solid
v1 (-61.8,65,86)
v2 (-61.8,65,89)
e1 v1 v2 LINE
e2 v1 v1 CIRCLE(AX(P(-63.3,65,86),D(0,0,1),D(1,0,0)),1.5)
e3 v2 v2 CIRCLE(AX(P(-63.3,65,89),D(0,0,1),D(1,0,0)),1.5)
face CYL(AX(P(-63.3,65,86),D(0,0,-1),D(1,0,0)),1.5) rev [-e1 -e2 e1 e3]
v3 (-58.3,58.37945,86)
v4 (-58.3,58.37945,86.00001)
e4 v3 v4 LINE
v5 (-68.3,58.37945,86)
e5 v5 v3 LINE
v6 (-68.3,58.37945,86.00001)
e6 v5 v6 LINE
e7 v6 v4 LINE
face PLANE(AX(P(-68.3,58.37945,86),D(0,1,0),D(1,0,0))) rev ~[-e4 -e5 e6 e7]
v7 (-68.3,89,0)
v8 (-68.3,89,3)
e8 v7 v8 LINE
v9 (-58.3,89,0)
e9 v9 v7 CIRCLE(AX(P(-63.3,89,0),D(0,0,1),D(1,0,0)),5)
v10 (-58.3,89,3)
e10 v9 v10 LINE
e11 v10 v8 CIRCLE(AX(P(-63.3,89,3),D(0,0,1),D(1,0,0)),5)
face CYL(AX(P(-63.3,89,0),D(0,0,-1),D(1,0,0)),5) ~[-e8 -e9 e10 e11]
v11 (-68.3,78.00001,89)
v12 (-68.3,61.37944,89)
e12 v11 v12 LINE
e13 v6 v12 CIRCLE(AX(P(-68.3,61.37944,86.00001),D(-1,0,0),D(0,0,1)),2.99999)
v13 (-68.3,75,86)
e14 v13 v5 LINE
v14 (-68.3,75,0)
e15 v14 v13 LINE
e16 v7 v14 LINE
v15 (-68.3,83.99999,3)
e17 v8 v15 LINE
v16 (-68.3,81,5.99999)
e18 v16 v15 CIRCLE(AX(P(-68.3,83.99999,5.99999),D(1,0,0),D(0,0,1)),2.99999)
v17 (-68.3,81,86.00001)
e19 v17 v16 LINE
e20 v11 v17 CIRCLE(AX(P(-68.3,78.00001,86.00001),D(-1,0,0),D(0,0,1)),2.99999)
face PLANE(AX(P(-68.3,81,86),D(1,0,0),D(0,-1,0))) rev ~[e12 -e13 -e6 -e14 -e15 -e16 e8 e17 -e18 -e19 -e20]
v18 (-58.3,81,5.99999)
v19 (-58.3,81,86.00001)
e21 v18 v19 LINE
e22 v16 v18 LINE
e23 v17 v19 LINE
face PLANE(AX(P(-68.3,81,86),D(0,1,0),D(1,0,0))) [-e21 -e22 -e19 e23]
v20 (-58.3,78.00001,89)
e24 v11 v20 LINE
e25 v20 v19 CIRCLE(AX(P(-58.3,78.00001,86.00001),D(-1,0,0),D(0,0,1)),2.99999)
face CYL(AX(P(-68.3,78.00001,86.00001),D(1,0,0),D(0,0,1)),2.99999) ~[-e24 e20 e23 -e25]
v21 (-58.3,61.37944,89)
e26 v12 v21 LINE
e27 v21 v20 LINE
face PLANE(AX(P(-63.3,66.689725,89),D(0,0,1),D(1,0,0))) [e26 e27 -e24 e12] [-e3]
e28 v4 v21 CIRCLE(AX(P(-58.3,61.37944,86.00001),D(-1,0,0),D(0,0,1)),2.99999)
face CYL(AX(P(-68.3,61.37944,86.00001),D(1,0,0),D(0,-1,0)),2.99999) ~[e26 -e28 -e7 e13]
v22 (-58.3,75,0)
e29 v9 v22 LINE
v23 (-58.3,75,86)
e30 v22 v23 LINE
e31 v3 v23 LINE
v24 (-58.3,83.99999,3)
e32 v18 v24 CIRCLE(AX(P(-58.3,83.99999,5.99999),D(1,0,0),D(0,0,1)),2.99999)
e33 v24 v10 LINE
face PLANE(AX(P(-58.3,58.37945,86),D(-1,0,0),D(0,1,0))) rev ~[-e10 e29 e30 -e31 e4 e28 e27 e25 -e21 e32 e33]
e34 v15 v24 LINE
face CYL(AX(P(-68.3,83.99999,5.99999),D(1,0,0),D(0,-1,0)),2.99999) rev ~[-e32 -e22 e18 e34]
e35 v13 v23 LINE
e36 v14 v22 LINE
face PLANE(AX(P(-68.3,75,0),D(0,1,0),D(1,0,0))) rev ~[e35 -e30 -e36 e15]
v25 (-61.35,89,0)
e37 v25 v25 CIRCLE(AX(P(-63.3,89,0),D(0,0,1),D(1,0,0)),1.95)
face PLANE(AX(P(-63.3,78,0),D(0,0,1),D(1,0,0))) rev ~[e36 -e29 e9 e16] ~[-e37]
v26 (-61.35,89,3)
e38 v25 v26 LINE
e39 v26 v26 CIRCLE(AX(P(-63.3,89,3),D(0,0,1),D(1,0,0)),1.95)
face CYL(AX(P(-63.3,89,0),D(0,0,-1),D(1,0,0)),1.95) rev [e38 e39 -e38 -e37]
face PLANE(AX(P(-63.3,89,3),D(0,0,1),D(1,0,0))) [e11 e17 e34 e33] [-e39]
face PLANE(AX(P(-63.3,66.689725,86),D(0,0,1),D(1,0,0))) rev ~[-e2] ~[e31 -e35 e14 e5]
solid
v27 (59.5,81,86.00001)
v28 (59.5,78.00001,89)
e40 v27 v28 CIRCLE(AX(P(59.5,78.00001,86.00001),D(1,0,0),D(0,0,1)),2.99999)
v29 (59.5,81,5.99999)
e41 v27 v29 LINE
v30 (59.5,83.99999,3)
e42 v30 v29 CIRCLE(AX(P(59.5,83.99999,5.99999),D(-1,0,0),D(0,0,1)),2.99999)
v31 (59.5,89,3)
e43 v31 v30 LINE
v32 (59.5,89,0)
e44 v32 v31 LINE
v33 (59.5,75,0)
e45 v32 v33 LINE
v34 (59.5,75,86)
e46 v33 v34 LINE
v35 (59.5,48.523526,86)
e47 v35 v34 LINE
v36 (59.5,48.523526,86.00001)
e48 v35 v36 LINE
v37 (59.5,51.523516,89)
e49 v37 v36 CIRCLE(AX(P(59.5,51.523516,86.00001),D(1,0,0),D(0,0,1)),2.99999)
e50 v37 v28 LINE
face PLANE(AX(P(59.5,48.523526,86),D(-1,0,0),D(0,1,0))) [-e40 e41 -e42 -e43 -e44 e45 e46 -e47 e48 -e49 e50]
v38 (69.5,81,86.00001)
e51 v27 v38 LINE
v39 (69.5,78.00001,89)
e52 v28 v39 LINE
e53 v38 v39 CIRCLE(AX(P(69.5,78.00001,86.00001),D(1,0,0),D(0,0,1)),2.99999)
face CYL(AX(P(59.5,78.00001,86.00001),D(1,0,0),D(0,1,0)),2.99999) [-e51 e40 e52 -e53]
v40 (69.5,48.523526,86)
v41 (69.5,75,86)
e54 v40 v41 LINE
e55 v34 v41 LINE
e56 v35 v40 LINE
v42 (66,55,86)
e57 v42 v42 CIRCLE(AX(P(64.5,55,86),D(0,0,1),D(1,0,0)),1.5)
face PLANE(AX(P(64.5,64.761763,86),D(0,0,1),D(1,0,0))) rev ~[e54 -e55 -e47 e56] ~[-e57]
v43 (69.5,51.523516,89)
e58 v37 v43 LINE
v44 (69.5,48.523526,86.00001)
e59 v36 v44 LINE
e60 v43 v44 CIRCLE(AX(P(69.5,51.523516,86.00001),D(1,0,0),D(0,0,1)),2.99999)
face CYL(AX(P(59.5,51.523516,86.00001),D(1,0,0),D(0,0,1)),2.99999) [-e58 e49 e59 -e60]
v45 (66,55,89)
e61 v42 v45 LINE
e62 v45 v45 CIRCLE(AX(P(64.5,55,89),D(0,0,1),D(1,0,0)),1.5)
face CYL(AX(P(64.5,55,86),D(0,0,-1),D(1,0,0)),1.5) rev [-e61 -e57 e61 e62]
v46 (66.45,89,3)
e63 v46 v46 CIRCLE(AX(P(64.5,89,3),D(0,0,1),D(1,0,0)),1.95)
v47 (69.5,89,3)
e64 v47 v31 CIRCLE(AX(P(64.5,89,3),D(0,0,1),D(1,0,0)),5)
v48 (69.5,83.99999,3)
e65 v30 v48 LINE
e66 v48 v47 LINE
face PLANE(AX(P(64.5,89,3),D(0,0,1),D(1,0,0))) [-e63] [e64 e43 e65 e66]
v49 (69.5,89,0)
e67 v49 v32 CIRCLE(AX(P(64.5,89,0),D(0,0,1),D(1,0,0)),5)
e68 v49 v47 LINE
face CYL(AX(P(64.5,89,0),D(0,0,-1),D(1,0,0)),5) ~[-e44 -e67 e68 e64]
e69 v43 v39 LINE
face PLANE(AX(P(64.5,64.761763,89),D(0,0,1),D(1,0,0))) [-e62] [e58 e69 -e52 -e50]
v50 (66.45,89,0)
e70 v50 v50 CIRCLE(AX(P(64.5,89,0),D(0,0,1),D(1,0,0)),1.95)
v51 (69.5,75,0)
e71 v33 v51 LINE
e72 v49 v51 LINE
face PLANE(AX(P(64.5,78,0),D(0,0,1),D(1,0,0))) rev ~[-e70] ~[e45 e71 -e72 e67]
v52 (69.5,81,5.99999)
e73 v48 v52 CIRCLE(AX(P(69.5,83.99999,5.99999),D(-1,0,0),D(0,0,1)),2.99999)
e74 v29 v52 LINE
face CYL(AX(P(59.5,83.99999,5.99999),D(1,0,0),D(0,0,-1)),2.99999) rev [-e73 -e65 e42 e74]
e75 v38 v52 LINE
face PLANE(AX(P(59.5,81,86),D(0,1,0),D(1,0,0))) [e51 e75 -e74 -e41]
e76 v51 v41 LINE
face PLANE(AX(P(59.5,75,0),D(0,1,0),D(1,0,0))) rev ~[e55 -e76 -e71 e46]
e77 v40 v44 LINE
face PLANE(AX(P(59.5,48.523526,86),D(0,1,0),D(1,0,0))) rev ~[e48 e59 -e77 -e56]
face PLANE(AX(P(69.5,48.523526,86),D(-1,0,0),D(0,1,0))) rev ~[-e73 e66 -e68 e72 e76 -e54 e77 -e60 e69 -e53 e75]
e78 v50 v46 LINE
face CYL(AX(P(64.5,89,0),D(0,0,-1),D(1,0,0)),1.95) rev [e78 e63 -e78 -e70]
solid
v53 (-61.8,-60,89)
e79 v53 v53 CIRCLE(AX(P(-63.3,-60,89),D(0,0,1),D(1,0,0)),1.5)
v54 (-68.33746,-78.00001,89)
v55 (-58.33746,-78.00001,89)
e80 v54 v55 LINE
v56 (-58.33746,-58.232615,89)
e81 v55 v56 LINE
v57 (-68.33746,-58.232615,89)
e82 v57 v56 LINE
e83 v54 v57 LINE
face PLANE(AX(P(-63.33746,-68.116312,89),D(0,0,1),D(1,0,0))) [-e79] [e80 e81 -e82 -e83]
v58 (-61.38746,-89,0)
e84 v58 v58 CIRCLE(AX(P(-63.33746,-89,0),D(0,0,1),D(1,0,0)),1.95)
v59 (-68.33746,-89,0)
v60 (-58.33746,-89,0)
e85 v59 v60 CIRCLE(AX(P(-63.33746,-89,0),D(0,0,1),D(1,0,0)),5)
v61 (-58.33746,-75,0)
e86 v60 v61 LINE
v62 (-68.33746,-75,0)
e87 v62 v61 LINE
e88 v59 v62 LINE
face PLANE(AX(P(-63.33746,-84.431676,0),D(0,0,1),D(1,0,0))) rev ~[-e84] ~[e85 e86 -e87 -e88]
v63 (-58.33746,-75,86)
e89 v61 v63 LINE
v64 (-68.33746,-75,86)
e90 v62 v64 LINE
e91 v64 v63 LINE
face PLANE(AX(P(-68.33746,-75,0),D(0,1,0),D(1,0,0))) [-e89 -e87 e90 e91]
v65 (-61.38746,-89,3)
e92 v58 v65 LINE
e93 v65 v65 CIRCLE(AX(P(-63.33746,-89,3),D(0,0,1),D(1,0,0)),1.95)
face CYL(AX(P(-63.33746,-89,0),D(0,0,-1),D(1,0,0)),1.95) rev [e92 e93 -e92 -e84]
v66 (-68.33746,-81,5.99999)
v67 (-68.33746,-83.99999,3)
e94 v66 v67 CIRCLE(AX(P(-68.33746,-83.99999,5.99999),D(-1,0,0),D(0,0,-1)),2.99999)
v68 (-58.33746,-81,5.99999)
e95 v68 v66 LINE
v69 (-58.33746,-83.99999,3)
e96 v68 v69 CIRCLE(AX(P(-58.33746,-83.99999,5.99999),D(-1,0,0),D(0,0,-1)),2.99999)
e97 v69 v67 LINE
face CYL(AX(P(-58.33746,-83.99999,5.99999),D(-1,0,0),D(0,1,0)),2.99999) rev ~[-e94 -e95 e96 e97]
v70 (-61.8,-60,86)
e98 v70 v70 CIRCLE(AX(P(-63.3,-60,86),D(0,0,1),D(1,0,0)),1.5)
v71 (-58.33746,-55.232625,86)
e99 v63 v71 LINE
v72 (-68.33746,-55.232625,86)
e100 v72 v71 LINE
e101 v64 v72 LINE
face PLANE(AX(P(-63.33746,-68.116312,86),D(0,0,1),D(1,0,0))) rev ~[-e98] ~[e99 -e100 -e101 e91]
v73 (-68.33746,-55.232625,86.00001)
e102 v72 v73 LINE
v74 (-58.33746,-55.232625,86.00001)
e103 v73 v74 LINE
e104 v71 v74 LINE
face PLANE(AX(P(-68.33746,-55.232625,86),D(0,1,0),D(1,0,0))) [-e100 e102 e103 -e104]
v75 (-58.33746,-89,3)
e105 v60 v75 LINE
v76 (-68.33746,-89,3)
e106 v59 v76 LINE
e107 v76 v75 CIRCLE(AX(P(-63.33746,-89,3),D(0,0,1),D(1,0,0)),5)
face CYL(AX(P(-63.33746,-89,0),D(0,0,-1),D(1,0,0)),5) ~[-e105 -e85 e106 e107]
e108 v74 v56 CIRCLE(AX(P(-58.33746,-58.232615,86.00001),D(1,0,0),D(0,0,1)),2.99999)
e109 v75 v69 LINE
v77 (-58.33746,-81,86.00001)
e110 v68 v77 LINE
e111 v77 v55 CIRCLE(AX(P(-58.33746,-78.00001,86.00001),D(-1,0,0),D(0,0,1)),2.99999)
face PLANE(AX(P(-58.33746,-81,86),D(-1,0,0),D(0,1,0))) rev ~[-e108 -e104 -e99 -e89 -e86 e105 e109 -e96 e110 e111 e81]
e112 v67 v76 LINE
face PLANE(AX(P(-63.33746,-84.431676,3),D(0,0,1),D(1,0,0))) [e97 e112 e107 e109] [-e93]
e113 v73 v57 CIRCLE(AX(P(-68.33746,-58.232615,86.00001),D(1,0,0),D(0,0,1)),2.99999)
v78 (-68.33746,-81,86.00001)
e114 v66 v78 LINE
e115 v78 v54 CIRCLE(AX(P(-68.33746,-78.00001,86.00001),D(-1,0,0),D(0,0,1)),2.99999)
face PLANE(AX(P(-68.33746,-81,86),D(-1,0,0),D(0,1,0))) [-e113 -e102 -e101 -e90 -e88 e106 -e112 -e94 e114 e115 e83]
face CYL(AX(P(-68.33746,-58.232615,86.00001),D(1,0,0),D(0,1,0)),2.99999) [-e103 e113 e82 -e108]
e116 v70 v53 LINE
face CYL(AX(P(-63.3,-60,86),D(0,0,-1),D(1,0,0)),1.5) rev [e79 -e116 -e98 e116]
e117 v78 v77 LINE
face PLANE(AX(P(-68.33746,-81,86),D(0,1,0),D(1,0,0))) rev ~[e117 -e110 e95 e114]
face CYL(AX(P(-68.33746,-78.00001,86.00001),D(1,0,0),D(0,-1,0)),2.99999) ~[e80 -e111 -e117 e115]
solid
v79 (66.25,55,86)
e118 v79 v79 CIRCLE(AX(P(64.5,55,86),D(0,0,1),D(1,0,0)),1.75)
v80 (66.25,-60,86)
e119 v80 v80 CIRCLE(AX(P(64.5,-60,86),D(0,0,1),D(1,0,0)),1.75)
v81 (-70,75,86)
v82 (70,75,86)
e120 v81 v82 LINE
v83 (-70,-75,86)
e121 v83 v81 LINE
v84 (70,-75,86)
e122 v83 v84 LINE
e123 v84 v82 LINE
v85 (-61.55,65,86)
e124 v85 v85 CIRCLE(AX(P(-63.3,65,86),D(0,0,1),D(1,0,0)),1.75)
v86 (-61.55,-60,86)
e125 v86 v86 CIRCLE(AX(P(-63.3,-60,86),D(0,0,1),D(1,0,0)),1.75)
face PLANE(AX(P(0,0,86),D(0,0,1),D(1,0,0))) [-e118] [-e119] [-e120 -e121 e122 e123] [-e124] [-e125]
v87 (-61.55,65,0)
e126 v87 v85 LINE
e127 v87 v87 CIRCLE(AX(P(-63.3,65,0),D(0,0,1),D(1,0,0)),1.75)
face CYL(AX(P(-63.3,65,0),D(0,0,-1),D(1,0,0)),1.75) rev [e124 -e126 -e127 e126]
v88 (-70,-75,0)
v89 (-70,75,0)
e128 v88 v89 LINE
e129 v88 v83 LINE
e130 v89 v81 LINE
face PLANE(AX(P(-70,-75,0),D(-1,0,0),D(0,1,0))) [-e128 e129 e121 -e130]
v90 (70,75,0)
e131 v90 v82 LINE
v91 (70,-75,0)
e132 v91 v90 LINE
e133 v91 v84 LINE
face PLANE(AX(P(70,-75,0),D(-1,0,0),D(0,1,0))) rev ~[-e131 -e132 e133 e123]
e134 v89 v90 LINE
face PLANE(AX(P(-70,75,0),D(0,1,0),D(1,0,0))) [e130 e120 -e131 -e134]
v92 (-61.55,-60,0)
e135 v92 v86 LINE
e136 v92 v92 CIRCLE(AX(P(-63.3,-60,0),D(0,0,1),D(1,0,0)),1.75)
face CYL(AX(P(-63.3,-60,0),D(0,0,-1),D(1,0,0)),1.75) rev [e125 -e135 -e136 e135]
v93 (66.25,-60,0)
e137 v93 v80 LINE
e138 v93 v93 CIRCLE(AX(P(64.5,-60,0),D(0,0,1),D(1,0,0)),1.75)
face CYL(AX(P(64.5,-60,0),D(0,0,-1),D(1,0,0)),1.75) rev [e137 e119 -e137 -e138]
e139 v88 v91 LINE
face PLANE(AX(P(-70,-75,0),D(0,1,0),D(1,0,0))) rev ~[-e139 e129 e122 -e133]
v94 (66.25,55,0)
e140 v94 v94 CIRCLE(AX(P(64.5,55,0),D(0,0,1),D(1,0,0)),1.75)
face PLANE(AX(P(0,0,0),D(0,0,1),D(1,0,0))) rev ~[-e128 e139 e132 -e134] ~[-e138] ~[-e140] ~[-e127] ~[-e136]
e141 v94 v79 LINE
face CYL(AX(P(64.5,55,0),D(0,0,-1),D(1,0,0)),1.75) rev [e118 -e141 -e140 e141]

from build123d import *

# Parameters (mm, degrees)
F0_W      = 140
F0_H      = 150
F0_R      = 1.75
F1_DEPTH  = 86
F2_R      = 1.95
F3_DEPTH  = 3
F2_W      = 10
F2_H      = 6
F4_DEPTH  = 86
F5_W      = 10
F5_H      = 16.6205504089
F5_R      = 1.5
F5_H_2    = 6
F6_DEPTH  = 3
F7_R      = 1.95
F8_DEPTH  = 3
F7_W      = 10
F7_H      = 6
F9_DEPTH  = 86
F10_W     = 10
F10_H     = 32.4764741033
F10_R     = 1.5
F11_DEPTH = 3
F12_W     = 10
F12_H     = 6
F13_DEPTH = 86
F12_R     = 1.95
F14_DEPTH = 3
F15_W     = 10
F15_H     = 25.7673753845
F15_R     = 1.5
F16_DEPTH = 3
F17_R     = 2.99999
F17_2_R   = 2.99999
F17_3_R   = 2.99999


# Not quite as in the source:
# - a fillet or chamfer is up to 0.001 mm smaller than in the source, because OpenCascade refuses the exact size


with BuildPart() as f1:
    # F0 (on Top) → F1 (new body)
    with BuildSketch(Plane.XY):
        Rectangle(F0_W, F0_H)
        with Locations((-63.3, -60)):
            Circle(F0_R, mode=Mode.SUBTRACT)
        with Locations((64.5, -60)):
            Circle(F0_R, mode=Mode.SUBTRACT)
        with Locations((-63.3, 65)):
            Circle(F0_R, mode=Mode.SUBTRACT)
        with Locations((64.5, 55)):
            Circle(F0_R, mode=Mode.SUBTRACT)
    extrude(amount=F1_DEPTH)


with BuildPart() as f3:
    # F2 (on Top) → F3 (new body)
    with BuildSketch(Plane.XY):
        with BuildLine():
            ThreePointArc((-68.3, 89), (-63.3, 84), (-58.3, 89))
            ThreePointArc((-58.3, 89), (-63.3, 94), (-68.3, 89))
        make_face()
        with Locations((-63.3, 89)):
            Circle(F2_R, mode=Mode.SUBTRACT)
        with BuildLine():
            Line((-58.3, 81), (-58.3, 89))
            ThreePointArc((-58.3, 89), (-63.3, 84), (-68.3, 89))
            Line((-68.3, 89), (-68.3, 81))
            Line((-68.3, 81), (-58.3, 81))
        make_face()
    extrude(amount=F3_DEPTH)

    # F2 (on Top) → F4 (join)
    with BuildSketch(Plane.XY):
        with Locations((-63.3, 78)):
            Rectangle(F2_W, F2_H)
    extrude(amount=F4_DEPTH)

    # F5 (on face) → F6 (join)
    with BuildSketch(Plane.XY.offset(86)):
        with Locations((-63.3, 66.6897247956)):
            Rectangle(F5_W, F5_H)
        with Locations((-63.3, 65)):
            Circle(F5_R, mode=Mode.SUBTRACT)
        with Locations((-63.3, 78)):
            Rectangle(F5_W, F5_H_2)
    extrude(amount=F6_DEPTH)

    # F17 (radius 3 in the source; OpenCascade refuses exactly that, so slightly less here)
    f17_edges = [f3.edges().sort_by_distance(p)[0] for p in [
        (-63.3, 81, 89),
        (-63.3, 81, 3),
        (-63.3, 58.37945, 89),
    ]]
    fillet(f17_edges, radius=F17_R)


with BuildPart() as f8:
    # F7 (on Top) → F8 (new body)
    with BuildSketch(Plane.XY):
        with BuildLine():
            ThreePointArc((59.5, 89), (64.5, 84), (69.5, 89))
            ThreePointArc((69.5, 89), (64.5, 94), (59.5, 89))
        make_face()
        with Locations((64.5, 89)):
            Circle(F7_R, mode=Mode.SUBTRACT)
        with BuildLine():
            Line((69.5, 81), (69.5, 89))
            ThreePointArc((69.5, 89), (64.5, 84), (59.5, 89))
            Line((59.5, 89), (59.5, 81))
            Line((59.5, 81), (69.5, 81))
        make_face()
    extrude(amount=F8_DEPTH)

    # F7 (on Top) → F9 (join)
    with BuildSketch(Plane.XY):
        with Locations((64.5, 78)):
            Rectangle(F7_W, F7_H)
    extrude(amount=F9_DEPTH)

    # F10 (on face) → F11 (join)
    with BuildSketch(Plane.XY.offset(86)):
        with Locations((64.5, 64.7617629484)):
            Rectangle(F10_W, F10_H)
        with Locations((64.5, 55)):
            Circle(F10_R, mode=Mode.SUBTRACT)
    extrude(amount=F11_DEPTH)

    # F17#2 (radius 3 in the source; OpenCascade refuses exactly that, so slightly less here)
    f17_2_edges = [f8.edges().sort_by_distance(p)[0] for p in [
        (64.5, 81, 89),
        (64.5, 81, 3),
        (64.5, 48.523526, 89),
    ]]
    fillet(f17_2_edges, radius=F17_2_R)


with BuildPart() as f13:
    # F12 (on Top) → F13 (new body)
    with BuildSketch(Plane.XY):
        with Locations((-63.3374598043, -78)):
            Rectangle(F12_W, F12_H)
    extrude(amount=F13_DEPTH)

    # F12 (on Top) → F14 (join)
    with BuildSketch(Plane.XY):
        with BuildLine():
            ThreePointArc((-68.3374598043, -89), (-63.3374598043, -84), (-58.3374598043, -89))
            Line((-58.3374598043, -89), (-58.3374598043, -81))
            Line((-58.3374598043, -81), (-68.3374598043, -81))
            Line((-68.3374598043, -81), (-68.3374598043, -89))
        make_face()
        with BuildLine():
            ThreePointArc((-68.3374598043, -89), (-63.3374598043, -94), (-58.3374598043, -89))
            ThreePointArc((-58.3374598043, -89), (-63.3374598043, -84), (-68.3374598043, -89))
        make_face()
        with Locations((-63.3374598043, -89)):
            Circle(F12_R, mode=Mode.SUBTRACT)
    extrude(amount=F14_DEPTH)

    # F15 (on face) → F16 (join)
    with BuildSketch(Plane.XY.offset(86)):
        with Locations((-63.3374598043, -68.1163123077)):
            Rectangle(F15_W, F15_H)
        with Locations((-63.3, -60)):
            Circle(F15_R, mode=Mode.SUBTRACT)
    extrude(amount=F16_DEPTH)

    # F17#3 (radius 3 in the source; OpenCascade refuses exactly that, so slightly less here)
    f17_3_edges = [f13.edges().sort_by_distance(p)[0] for p in [
        (-63.33746, -81, 89),
        (-63.33746, -55.232625, 89),
        (-63.33746, -81, 3),
    ]]
    fillet(f17_3_edges, radius=F17_3_R)


solid = Compound([f1.part, f3.part, f8.part, f13.part])
